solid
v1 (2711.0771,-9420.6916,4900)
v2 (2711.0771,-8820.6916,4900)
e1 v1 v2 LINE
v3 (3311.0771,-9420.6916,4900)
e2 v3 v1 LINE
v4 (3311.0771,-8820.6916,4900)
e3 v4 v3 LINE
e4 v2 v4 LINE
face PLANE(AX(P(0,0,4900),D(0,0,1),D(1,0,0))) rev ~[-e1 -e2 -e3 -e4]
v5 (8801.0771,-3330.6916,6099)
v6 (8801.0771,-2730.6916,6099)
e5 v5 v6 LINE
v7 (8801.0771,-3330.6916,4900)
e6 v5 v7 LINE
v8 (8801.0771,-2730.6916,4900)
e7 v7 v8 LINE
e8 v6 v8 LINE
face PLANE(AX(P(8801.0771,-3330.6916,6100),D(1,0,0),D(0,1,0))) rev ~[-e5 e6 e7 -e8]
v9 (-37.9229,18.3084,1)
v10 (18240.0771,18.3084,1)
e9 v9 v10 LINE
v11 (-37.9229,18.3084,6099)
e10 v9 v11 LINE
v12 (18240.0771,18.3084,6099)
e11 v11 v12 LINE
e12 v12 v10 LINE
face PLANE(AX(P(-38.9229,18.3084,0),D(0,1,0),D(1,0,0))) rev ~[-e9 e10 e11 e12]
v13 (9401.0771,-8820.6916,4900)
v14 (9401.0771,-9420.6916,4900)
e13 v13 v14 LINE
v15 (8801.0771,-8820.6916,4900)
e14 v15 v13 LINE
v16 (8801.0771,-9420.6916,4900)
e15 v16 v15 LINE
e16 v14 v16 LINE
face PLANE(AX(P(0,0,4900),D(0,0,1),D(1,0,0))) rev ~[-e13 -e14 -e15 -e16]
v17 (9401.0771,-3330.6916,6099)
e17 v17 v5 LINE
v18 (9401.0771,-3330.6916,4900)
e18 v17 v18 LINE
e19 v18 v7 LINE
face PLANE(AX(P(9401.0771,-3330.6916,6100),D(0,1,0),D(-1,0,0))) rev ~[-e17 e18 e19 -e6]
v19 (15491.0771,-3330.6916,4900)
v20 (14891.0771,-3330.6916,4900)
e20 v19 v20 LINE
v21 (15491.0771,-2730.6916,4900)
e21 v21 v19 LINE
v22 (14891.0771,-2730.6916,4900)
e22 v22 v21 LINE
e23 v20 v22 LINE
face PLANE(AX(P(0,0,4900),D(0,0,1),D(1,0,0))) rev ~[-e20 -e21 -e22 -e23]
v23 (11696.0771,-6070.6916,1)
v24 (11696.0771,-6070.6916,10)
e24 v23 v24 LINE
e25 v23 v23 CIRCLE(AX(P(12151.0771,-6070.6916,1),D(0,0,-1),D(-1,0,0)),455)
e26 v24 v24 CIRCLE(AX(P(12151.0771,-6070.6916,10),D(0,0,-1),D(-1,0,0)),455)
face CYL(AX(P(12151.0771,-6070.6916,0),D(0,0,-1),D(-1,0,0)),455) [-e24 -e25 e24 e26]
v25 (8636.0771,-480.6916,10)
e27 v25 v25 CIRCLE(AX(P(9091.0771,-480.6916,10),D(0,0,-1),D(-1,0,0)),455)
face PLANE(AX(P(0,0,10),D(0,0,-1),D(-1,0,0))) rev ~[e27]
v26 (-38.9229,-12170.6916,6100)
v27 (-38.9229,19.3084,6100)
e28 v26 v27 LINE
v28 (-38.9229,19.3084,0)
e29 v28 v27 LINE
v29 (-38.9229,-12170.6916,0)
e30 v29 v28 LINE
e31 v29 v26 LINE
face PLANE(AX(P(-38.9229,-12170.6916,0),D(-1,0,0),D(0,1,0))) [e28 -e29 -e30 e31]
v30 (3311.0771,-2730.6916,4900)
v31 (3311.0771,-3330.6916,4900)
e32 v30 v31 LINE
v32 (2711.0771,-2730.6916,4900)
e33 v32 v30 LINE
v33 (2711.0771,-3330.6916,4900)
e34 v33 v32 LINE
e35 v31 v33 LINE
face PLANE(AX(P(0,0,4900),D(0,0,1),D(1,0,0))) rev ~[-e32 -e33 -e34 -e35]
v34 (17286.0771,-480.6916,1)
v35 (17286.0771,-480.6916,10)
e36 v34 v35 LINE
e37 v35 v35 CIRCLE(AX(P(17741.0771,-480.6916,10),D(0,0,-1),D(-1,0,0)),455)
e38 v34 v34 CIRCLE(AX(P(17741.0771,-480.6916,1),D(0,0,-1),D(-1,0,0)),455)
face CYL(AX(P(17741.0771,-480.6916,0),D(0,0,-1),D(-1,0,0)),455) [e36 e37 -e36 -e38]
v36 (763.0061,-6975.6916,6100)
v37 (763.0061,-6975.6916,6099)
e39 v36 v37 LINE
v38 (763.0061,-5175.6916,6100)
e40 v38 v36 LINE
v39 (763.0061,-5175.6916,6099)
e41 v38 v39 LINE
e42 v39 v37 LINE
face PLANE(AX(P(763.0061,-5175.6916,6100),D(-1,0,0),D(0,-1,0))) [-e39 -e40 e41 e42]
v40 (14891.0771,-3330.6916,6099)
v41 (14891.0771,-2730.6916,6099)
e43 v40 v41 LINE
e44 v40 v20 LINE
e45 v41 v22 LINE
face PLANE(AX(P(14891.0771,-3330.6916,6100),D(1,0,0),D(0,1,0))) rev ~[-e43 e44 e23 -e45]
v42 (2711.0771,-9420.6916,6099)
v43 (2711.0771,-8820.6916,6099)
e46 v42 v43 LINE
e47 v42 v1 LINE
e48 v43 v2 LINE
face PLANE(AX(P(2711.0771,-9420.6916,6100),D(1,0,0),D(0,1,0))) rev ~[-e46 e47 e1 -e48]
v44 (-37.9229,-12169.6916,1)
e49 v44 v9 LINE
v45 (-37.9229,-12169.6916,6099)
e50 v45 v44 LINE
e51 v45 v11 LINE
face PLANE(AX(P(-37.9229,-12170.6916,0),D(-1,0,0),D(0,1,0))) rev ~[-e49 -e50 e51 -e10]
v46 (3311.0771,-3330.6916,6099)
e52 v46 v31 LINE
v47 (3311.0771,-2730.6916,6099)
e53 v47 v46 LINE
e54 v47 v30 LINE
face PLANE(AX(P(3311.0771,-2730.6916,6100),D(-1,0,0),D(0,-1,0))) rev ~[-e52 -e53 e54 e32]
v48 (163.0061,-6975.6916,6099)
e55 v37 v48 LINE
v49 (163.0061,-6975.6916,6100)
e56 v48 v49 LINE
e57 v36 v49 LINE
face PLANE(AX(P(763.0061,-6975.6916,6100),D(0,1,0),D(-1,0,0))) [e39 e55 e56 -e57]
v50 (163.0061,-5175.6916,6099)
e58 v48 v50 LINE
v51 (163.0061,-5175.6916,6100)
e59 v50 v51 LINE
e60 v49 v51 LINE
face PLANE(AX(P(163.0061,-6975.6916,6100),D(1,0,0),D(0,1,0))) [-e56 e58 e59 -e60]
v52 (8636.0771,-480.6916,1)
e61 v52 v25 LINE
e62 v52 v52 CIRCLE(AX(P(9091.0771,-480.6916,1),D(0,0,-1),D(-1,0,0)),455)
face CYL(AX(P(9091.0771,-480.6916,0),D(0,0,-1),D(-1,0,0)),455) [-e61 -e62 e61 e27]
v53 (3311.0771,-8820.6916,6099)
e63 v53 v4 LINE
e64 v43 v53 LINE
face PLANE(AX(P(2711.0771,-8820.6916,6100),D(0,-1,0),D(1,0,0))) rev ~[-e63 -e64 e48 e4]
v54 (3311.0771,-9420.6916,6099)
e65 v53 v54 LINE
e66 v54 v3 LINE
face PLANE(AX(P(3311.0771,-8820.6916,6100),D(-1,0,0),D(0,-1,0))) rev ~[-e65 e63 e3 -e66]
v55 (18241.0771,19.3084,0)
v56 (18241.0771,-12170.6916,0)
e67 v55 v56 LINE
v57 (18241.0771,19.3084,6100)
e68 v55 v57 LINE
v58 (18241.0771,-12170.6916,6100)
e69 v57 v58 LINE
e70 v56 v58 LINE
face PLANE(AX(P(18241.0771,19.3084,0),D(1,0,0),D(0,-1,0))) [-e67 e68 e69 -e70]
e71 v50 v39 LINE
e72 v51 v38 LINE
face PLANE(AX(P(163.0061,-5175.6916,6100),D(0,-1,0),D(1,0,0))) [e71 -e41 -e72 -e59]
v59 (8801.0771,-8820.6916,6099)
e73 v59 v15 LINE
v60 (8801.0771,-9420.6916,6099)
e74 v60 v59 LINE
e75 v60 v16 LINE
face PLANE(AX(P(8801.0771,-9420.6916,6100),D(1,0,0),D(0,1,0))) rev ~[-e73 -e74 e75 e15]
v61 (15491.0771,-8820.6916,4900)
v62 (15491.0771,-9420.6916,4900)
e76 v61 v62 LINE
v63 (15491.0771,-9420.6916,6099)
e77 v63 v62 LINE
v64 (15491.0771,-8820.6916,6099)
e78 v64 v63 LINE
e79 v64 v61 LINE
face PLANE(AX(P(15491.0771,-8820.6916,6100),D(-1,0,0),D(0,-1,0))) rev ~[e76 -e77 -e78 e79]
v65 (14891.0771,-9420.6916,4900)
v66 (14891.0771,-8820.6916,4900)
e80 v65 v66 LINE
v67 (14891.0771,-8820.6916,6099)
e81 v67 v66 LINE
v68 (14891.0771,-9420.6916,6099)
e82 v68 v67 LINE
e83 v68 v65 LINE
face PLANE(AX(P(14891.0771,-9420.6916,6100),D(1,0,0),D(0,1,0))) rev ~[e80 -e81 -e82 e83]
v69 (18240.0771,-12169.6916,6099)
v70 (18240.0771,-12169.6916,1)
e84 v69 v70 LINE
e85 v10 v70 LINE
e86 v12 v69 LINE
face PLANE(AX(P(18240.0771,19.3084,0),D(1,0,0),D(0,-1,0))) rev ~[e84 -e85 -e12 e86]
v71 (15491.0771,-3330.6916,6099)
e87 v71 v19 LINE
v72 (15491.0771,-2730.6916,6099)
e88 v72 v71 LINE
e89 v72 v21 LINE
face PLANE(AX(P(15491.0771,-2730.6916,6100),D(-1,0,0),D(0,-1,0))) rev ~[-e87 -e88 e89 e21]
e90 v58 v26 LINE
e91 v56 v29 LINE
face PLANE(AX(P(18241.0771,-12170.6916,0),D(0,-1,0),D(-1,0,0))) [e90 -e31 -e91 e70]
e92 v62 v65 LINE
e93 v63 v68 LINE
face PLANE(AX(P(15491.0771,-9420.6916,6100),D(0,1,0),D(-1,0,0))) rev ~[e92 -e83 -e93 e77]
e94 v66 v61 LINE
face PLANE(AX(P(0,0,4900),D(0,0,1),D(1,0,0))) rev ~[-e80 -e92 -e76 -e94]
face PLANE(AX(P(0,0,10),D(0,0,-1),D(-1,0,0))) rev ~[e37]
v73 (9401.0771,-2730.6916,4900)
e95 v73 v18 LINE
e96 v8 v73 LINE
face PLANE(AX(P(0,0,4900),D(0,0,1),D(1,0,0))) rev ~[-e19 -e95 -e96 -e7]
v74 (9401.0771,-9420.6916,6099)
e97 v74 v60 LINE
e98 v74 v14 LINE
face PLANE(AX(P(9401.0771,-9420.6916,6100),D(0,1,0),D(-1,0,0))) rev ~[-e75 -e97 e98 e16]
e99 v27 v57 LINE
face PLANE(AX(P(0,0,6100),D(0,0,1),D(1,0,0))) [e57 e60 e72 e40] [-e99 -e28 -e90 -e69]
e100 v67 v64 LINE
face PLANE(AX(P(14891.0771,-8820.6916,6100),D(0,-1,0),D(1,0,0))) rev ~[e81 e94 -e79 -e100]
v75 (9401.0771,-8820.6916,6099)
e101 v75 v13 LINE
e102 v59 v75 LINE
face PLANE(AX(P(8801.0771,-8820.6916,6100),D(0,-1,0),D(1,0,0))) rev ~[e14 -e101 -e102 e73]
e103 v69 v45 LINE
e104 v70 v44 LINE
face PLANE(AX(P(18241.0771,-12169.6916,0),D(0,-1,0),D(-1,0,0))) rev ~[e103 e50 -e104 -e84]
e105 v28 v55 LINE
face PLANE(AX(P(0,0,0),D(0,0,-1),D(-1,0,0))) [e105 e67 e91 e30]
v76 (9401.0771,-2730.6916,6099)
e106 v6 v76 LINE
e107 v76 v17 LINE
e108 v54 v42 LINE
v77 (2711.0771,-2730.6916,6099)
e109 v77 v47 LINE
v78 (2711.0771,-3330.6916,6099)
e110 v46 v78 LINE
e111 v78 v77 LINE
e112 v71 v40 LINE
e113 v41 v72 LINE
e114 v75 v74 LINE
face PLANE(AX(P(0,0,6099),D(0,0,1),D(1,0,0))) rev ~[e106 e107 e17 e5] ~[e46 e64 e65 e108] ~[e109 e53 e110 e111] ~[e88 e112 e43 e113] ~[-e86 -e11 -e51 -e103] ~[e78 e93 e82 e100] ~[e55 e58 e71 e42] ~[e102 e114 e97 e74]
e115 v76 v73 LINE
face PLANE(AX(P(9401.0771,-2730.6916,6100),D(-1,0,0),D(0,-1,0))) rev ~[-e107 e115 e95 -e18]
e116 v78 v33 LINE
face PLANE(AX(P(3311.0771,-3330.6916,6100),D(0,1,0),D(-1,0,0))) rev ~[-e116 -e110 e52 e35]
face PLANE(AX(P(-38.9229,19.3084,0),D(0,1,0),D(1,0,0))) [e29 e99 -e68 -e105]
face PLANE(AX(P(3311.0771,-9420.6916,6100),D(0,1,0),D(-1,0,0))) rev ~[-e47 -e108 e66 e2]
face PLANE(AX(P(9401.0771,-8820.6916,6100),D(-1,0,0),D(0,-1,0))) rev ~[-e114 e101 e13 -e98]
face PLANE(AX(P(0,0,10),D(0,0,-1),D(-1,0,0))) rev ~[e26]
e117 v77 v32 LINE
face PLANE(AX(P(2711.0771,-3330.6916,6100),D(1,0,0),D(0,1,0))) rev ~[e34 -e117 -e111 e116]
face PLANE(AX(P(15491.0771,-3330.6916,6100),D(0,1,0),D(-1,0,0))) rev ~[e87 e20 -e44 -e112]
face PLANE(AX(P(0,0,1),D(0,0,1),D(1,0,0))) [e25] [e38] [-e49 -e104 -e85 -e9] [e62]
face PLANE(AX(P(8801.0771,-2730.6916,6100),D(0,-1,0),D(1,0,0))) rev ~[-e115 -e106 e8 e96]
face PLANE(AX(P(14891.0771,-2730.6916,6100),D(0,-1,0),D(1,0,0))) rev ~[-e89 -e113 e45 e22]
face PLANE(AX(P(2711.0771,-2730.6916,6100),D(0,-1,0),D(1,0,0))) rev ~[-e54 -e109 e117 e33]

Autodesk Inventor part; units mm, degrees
ref_plane "YZ Plane" through (0, 0, 0) normal (1, 0, 0) x (0, 1, 0)
ref_plane "XZ Plane" through (0, 0, 0) normal (0, 1, 0) x (-1, 0, 0)
ref_plane "XY Plane" through (0, 0, 0) normal (0, 0, 1) x (1, 0, 0)
sketch "Sketch1" plane through (0, 0, 0) normal (0, 0, 1) x (1, 0, 0)
  line L0 (-38.9229, 19.3084) -> (18241.0771, 19.3084)
  line L1 (18241.0771, 19.3084) -> (18241.0771, -12170.6916)
  line L2 (18241.0771, -12170.6916) -> (-38.9229, -12170.6916)
  line L3 (-38.9229, -12170.6916) -> (-38.9229, 19.3084)
  dimension "d0" = 18280
  dimension "d1" = 12190
extrude "Extrusion1" add sketch "Sketch1" along normal blind 6100
sketch "Sketch2" plane through (0, 0, 6100) normal (0, 0, 1) x (1, 0, 0)
  line L0 (18241.0771, 19.3084) -> (18241.0771, -12170.6916) projected
  line L1 (-38.9229, 19.3084) -> (18241.0771, 19.3084) projected
  line L2 (-38.9229, -12170.6916) -> (-38.9229, 19.3084) projected
  line L3 (18241.0771, -12170.6916) -> (-38.9229, -12170.6916) projected
  line L4 (163.0061, -5175.6916) -> (763.0061, -5175.6916)
  line L5 (763.0061, -5175.6916) -> (763.0061, -6975.6916)
  line L6 (763.0061, -6975.6916) -> (163.0061, -6975.6916)
  line L7 (163.0061, -6975.6916) -> (163.0061, -5175.6916)
  line L8 (2711.0771, -2730.6916) -> (3311.0771, -2730.6916)
  line L9 (3311.0771, -2730.6916) -> (3311.0771, -3330.6916)
  line L10 (3311.0771, -3330.6916) -> (2711.0771, -3330.6916)
  line L11 (2711.0771, -3330.6916) -> (2711.0771, -2730.6916)
  line L12 (8801.0771, -2730.6916) -> (9401.0771, -2730.6916)
  line L13 (9401.0771, -2730.6916) -> (9401.0771, -3330.6916)
  line L14 (9401.0771, -3330.6916) -> (8801.0771, -3330.6916)
  line L15 (8801.0771, -3330.6916) -> (8801.0771, -2730.6916)
  line L16 (14891.0771, -2730.6916) -> (15491.0771, -2730.6916)
  line L17 (15491.0771, -2730.6916) -> (15491.0771, -3330.6916)
  line L18 (15491.0771, -3330.6916) -> (14891.0771, -3330.6916)
  line L19 (14891.0771, -3330.6916) -> (14891.0771, -2730.6916)
  line L20 (2711.0771, -8820.6916) -> (3311.0771, -8820.6916)
  line L21 (3311.0771, -8820.6916) -> (3311.0771, -9420.6916)
  line L22 (3311.0771, -9420.6916) -> (2711.0771, -9420.6916)
  line L23 (2711.0771, -9420.6916) -> (2711.0771, -8820.6916)
  line L24 (8801.0771, -8820.6916) -> (9401.0771, -8820.6916)
  line L25 (9401.0771, -8820.6916) -> (9401.0771, -9420.6916)
  line L26 (9401.0771, -9420.6916) -> (8801.0771, -9420.6916)
  line L27 (8801.0771, -9420.6916) -> (8801.0771, -8820.6916)
  line L28 (14891.0771, -8820.6916) -> (15491.0771, -8820.6916)
  line L29 (15491.0771, -8820.6916) -> (15491.0771, -9420.6916)
  line L30 (15491.0771, -9420.6916) -> (14891.0771, -9420.6916)
  line L31 (14891.0771, -9420.6916) -> (14891.0771, -8820.6916)
  dimension "d4" = 600
  dimension "d5" = 600
  dimension "d6" = 2750
  dimension "d7" = 600
  dimension "d8" = 600
  dimension "d9" = 2750
  dimension "d10" = 2750
  dimension "d11" = 600
  dimension "d12" = 600
  dimension "d13" = 2750
  dimension "d14" = 2750
  dimension "d15" = 8840
  dimension "d16" = 600
  dimension "d17" = 600
  dimension "d18" = 2750
  dimension "d19" = 2750
  dimension "d20" = 600
  dimension "d21" = 600
  dimension "d22" = 2750
  dimension "d23" = 600
  dimension "d24" = 600
  dimension "d25" = 2750
  dimension "d26" = 2750
  dimension "d27" = 8840
  dimension "d28" = 1800
  dimension "d29" = 600
  dimension "d30" = 5195
shell "Shell1" thickness 1 removed faces 0
extrude "Extrusion2" cut sketch "Sketch2" against normal mid plane 1000 contours L4 L5 L6 L7
extrude "Extrusion3" add sketch "Sketch2" against normal blind 1200 contours L20 L21 L22 L23
extrude "Extrusion4" add sketch "Sketch2" against normal blind 1200 contours L24 L25 L26 L27
extrude "Extrusion5" add sketch "Sketch2" against normal blind 1200 contours L28 L29 L30 L31
extrude "Extrusion6" add sketch "Sketch2" against normal blind 1200 contours L8 L9 L10 L11
extrude "Extrusion7" add sketch "Sketch2" against normal blind 1200 contours L12 L13 L14 L15
extrude "Extrusion8" add sketch "Sketch2" against normal blind 1200 contours L16 L17 L18 L19
sketch "Sketch5" plane through (0, 0, 0) normal (0, 0, -1) x (-1, 0, 0)
  line L0 (38.9229, 19.3084) -> (-18241.0771, 19.3084) projected
  line L1 (-18241.0771, 19.3084) -> (-18241.0771, -12170.6916) projected
  line L2 (-18241.0771, -12170.6916) -> (38.9229, -12170.6916) projected
  line L3 (38.9229, -12170.6916) -> (38.9229, 19.3084) projected
  line L4 (-6981.0771, -3330.6916) -> (-5761.0771, -3330.6916)
  line L5 (-5761.0771, -3330.6916) -> (-5761.0771, -5310.6916)
  line L6 (-5761.0771, -5310.6916) -> (-6981.0771, -5310.6916)
  line L7 (-6981.0771, -5310.6916) -> (-6981.0771, -3330.6916)
  line L8 (-6981.0771, -3330.6916) -> (-8501.0771, -3330.6916)
  line L9 (-8501.0771, -3330.6916) -> (-8501.0771, -4550.6916)
  line L10 (-8501.0771, -4550.6916) -> (-6981.0771, -4550.6916)
  line L11 (-6981.0771, -4550.6916) -> (-6981.0771, -3330.6916)
  line L12 (-8501.0771, -3330.6916) -> (-9721.0771, -3330.6916)
  line L13 (-9721.0771, -3330.6916) -> (-9721.0771, -5310.6916)
  line L14 (-9721.0771, -5310.6916) -> (-8501.0771, -5310.6916)
  line L15 (-8501.0771, -5310.6916) -> (-8501.0771, -3330.6916)
  line L16 (-9721.0771, -3330.6916) -> (-10941.0771, -3330.6916)
  line L17 (-10941.0771, -3330.6916) -> (-10941.0771, -5300)
  line L18 (-10941.0771, -5300) -> (-9721.0771, -5300)
  line L19 (-9721.0771, -5300) -> (-9721.0771, -3330.6916)
  line L20 (-10941.0771, -3330.6916) -> (-12461.0771, -3330.6916)
  line L21 (-12461.0771, -3330.6916) -> (-12461.0771, -4550.6916)
  line L22 (-12461.0771, -4550.6916) -> (-10941.0771, -4550.6916)
  line L23 (-10941.0771, -4550.6916) -> (-10941.0771, -3330.6916)
  line L24 (-12461.0771, -3330.6916) -> (-13981.0771, -3330.6916)
  line L25 (-13981.0771, -3330.6916) -> (-13981.0771, -4550.6916)
  line L26 (-13981.0771, -4550.6916) -> (-12461.0771, -4550.6916)
  line L27 (-12461.0771, -4550.6916) -> (-12461.0771, -3330.6916)
  line L28 (-14741.0771, -4550.6916) -> (-13521.0771, -4550.6916)
  line L29 (-13521.0771, -4550.6916) -> (-13521.0771, -6070.6916)
  line L30 (-13521.0771, -6070.6916) -> (-14741.0771, -6070.6916)
  line L31 (-14741.0771, -6070.6916) -> (-14741.0771, -4550.6916)
  line L32 (-14741.0771, -6070.6916) -> (-13521.0771, -6070.6916)
  line L33 (-13521.0771, -6070.6916) -> (-13521.0771, -7590.6916)
  line L34 (-13521.0771, -7590.6916) -> (-14741.0771, -7590.6916)
  line L35 (-14741.0771, -7590.6916) -> (-14741.0771, -6070.6916)
  line L36 (-14741.0771, -7590.6916) -> (-13831.0771, -7590.6916)
  line L37 (-13831.0771, -7590.6916) -> (-13831.0771, -9110.6916)
  line L38 (-13831.0771, -9110.6916) -> (-14741.0771, -9110.6916)
  line L39 (-14741.0771, -9110.6916) -> (-14741.0771, -7590.6916)
  line L40 (-9800, -10950.6916) -> (-8280, -10950.6916)
  line L41 (-8280, -10950.6916) -> (-8280, -12170.6916)
  line L42 (-8280, -12170.6916) -> (-9800, -12170.6916)
  line L43 (-9800, -12170.6916) -> (-9800, -10950.6916)
  line L44 (-3461.0771, -5480.6916) -> (-4681.0771, -5480.6916)
  line L45 (-4681.0771, -5480.6916) -> (-4681.0771, -7310.6916)
  line L46 (-4681.0771, -7310.6916) -> (-3461.0771, -7310.6916)
  line L47 (-3461.0771, -7310.6916) -> (-3461.0771, -5480.6916)
  line L48 (-3461.0771, -7310.6916) -> (-4681.0771, -7310.6916)
  line L49 (-4681.0771, -7310.6916) -> (-4681.0771, -9140.6916)
  line L50 (-4681.0771, -9140.6916) -> (-3461.0771, -9140.6916)
  line L51 (-3461.0771, -9140.6916) -> (-3461.0771, -7310.6916)
  line L52 (-4681.0771, -5480.6916) -> (-5761.0771, -4320.6916)
  line L53 (-4681.0771, -5480.6916) -> (-3627.7417, -4500)
  line L54 (-3627.7417, -4500) -> (-4700.1477, -3348.1566)
  line L55 (-4700.1477, -3348.1566) -> (-5761.0771, -4320.6916)
  circle A0 centre (-12151.0771, -6070.6916) radius 455
  circle A1 centre (-9111.0771, -4300) radius 455
  circle A2 centre (-9091.0771, -480.6916) radius 455
  circle A3 centre (-17741.0771, -480.6916) radius 455
  dimension "d66" = 1220
  dimension "d67" = 1980
  dimension "d68" = 3350
  dimension "d69" = 5800
  dimension "d70" = 1520
  dimension "d71" = 1220
  dimension "d72" = 1220
  dimension "d73" = 1980
  dimension "d74" = 1220
  dimension "d75" = 1520
  dimension "d76" = 1220
  dimension "d77" = 1520
  dimension "d78" = 1520
  dimension "d79" = 1220
  dimension "d80" = 3500
  dimension "d81" = 4570
  dimension "d82" = 1220
  dimension "d83" = 1520
  dimension "d84" = 1220
  dimension "d85" = 1520
  dimension "d86" = 910
  dimension "d90" = 1520
  dimension "d91" = 1220
  dimension "d92" = 1830
  dimension "d93" = 1220
  dimension "d94" = 3500
  dimension "d95" = 5500
  dimension "d96" = 1830
  dimension "d97" = 1220
  dimension "d126" = 910
  dimension "d128" = 12190
  dimension "d129" = 910
  dimension "d130" = 610
  dimension "d137" = 910
  dimension "d138" = 9150
  dimension "d139" = 910
  dimension "d140" = 500
  dimension "d141" = 500
  dimension "d142" = 500
extrude "Extrusion23" add sketch "Sketch5" against normal blind 10 contours A0
extrude "Extrusion26" add sketch "Sketch5" against normal blind 10 contours A2
extrude "Extrusion27" add sketch "Sketch5" against normal blind 10 contours A3
properties part number "SNL_FM"
